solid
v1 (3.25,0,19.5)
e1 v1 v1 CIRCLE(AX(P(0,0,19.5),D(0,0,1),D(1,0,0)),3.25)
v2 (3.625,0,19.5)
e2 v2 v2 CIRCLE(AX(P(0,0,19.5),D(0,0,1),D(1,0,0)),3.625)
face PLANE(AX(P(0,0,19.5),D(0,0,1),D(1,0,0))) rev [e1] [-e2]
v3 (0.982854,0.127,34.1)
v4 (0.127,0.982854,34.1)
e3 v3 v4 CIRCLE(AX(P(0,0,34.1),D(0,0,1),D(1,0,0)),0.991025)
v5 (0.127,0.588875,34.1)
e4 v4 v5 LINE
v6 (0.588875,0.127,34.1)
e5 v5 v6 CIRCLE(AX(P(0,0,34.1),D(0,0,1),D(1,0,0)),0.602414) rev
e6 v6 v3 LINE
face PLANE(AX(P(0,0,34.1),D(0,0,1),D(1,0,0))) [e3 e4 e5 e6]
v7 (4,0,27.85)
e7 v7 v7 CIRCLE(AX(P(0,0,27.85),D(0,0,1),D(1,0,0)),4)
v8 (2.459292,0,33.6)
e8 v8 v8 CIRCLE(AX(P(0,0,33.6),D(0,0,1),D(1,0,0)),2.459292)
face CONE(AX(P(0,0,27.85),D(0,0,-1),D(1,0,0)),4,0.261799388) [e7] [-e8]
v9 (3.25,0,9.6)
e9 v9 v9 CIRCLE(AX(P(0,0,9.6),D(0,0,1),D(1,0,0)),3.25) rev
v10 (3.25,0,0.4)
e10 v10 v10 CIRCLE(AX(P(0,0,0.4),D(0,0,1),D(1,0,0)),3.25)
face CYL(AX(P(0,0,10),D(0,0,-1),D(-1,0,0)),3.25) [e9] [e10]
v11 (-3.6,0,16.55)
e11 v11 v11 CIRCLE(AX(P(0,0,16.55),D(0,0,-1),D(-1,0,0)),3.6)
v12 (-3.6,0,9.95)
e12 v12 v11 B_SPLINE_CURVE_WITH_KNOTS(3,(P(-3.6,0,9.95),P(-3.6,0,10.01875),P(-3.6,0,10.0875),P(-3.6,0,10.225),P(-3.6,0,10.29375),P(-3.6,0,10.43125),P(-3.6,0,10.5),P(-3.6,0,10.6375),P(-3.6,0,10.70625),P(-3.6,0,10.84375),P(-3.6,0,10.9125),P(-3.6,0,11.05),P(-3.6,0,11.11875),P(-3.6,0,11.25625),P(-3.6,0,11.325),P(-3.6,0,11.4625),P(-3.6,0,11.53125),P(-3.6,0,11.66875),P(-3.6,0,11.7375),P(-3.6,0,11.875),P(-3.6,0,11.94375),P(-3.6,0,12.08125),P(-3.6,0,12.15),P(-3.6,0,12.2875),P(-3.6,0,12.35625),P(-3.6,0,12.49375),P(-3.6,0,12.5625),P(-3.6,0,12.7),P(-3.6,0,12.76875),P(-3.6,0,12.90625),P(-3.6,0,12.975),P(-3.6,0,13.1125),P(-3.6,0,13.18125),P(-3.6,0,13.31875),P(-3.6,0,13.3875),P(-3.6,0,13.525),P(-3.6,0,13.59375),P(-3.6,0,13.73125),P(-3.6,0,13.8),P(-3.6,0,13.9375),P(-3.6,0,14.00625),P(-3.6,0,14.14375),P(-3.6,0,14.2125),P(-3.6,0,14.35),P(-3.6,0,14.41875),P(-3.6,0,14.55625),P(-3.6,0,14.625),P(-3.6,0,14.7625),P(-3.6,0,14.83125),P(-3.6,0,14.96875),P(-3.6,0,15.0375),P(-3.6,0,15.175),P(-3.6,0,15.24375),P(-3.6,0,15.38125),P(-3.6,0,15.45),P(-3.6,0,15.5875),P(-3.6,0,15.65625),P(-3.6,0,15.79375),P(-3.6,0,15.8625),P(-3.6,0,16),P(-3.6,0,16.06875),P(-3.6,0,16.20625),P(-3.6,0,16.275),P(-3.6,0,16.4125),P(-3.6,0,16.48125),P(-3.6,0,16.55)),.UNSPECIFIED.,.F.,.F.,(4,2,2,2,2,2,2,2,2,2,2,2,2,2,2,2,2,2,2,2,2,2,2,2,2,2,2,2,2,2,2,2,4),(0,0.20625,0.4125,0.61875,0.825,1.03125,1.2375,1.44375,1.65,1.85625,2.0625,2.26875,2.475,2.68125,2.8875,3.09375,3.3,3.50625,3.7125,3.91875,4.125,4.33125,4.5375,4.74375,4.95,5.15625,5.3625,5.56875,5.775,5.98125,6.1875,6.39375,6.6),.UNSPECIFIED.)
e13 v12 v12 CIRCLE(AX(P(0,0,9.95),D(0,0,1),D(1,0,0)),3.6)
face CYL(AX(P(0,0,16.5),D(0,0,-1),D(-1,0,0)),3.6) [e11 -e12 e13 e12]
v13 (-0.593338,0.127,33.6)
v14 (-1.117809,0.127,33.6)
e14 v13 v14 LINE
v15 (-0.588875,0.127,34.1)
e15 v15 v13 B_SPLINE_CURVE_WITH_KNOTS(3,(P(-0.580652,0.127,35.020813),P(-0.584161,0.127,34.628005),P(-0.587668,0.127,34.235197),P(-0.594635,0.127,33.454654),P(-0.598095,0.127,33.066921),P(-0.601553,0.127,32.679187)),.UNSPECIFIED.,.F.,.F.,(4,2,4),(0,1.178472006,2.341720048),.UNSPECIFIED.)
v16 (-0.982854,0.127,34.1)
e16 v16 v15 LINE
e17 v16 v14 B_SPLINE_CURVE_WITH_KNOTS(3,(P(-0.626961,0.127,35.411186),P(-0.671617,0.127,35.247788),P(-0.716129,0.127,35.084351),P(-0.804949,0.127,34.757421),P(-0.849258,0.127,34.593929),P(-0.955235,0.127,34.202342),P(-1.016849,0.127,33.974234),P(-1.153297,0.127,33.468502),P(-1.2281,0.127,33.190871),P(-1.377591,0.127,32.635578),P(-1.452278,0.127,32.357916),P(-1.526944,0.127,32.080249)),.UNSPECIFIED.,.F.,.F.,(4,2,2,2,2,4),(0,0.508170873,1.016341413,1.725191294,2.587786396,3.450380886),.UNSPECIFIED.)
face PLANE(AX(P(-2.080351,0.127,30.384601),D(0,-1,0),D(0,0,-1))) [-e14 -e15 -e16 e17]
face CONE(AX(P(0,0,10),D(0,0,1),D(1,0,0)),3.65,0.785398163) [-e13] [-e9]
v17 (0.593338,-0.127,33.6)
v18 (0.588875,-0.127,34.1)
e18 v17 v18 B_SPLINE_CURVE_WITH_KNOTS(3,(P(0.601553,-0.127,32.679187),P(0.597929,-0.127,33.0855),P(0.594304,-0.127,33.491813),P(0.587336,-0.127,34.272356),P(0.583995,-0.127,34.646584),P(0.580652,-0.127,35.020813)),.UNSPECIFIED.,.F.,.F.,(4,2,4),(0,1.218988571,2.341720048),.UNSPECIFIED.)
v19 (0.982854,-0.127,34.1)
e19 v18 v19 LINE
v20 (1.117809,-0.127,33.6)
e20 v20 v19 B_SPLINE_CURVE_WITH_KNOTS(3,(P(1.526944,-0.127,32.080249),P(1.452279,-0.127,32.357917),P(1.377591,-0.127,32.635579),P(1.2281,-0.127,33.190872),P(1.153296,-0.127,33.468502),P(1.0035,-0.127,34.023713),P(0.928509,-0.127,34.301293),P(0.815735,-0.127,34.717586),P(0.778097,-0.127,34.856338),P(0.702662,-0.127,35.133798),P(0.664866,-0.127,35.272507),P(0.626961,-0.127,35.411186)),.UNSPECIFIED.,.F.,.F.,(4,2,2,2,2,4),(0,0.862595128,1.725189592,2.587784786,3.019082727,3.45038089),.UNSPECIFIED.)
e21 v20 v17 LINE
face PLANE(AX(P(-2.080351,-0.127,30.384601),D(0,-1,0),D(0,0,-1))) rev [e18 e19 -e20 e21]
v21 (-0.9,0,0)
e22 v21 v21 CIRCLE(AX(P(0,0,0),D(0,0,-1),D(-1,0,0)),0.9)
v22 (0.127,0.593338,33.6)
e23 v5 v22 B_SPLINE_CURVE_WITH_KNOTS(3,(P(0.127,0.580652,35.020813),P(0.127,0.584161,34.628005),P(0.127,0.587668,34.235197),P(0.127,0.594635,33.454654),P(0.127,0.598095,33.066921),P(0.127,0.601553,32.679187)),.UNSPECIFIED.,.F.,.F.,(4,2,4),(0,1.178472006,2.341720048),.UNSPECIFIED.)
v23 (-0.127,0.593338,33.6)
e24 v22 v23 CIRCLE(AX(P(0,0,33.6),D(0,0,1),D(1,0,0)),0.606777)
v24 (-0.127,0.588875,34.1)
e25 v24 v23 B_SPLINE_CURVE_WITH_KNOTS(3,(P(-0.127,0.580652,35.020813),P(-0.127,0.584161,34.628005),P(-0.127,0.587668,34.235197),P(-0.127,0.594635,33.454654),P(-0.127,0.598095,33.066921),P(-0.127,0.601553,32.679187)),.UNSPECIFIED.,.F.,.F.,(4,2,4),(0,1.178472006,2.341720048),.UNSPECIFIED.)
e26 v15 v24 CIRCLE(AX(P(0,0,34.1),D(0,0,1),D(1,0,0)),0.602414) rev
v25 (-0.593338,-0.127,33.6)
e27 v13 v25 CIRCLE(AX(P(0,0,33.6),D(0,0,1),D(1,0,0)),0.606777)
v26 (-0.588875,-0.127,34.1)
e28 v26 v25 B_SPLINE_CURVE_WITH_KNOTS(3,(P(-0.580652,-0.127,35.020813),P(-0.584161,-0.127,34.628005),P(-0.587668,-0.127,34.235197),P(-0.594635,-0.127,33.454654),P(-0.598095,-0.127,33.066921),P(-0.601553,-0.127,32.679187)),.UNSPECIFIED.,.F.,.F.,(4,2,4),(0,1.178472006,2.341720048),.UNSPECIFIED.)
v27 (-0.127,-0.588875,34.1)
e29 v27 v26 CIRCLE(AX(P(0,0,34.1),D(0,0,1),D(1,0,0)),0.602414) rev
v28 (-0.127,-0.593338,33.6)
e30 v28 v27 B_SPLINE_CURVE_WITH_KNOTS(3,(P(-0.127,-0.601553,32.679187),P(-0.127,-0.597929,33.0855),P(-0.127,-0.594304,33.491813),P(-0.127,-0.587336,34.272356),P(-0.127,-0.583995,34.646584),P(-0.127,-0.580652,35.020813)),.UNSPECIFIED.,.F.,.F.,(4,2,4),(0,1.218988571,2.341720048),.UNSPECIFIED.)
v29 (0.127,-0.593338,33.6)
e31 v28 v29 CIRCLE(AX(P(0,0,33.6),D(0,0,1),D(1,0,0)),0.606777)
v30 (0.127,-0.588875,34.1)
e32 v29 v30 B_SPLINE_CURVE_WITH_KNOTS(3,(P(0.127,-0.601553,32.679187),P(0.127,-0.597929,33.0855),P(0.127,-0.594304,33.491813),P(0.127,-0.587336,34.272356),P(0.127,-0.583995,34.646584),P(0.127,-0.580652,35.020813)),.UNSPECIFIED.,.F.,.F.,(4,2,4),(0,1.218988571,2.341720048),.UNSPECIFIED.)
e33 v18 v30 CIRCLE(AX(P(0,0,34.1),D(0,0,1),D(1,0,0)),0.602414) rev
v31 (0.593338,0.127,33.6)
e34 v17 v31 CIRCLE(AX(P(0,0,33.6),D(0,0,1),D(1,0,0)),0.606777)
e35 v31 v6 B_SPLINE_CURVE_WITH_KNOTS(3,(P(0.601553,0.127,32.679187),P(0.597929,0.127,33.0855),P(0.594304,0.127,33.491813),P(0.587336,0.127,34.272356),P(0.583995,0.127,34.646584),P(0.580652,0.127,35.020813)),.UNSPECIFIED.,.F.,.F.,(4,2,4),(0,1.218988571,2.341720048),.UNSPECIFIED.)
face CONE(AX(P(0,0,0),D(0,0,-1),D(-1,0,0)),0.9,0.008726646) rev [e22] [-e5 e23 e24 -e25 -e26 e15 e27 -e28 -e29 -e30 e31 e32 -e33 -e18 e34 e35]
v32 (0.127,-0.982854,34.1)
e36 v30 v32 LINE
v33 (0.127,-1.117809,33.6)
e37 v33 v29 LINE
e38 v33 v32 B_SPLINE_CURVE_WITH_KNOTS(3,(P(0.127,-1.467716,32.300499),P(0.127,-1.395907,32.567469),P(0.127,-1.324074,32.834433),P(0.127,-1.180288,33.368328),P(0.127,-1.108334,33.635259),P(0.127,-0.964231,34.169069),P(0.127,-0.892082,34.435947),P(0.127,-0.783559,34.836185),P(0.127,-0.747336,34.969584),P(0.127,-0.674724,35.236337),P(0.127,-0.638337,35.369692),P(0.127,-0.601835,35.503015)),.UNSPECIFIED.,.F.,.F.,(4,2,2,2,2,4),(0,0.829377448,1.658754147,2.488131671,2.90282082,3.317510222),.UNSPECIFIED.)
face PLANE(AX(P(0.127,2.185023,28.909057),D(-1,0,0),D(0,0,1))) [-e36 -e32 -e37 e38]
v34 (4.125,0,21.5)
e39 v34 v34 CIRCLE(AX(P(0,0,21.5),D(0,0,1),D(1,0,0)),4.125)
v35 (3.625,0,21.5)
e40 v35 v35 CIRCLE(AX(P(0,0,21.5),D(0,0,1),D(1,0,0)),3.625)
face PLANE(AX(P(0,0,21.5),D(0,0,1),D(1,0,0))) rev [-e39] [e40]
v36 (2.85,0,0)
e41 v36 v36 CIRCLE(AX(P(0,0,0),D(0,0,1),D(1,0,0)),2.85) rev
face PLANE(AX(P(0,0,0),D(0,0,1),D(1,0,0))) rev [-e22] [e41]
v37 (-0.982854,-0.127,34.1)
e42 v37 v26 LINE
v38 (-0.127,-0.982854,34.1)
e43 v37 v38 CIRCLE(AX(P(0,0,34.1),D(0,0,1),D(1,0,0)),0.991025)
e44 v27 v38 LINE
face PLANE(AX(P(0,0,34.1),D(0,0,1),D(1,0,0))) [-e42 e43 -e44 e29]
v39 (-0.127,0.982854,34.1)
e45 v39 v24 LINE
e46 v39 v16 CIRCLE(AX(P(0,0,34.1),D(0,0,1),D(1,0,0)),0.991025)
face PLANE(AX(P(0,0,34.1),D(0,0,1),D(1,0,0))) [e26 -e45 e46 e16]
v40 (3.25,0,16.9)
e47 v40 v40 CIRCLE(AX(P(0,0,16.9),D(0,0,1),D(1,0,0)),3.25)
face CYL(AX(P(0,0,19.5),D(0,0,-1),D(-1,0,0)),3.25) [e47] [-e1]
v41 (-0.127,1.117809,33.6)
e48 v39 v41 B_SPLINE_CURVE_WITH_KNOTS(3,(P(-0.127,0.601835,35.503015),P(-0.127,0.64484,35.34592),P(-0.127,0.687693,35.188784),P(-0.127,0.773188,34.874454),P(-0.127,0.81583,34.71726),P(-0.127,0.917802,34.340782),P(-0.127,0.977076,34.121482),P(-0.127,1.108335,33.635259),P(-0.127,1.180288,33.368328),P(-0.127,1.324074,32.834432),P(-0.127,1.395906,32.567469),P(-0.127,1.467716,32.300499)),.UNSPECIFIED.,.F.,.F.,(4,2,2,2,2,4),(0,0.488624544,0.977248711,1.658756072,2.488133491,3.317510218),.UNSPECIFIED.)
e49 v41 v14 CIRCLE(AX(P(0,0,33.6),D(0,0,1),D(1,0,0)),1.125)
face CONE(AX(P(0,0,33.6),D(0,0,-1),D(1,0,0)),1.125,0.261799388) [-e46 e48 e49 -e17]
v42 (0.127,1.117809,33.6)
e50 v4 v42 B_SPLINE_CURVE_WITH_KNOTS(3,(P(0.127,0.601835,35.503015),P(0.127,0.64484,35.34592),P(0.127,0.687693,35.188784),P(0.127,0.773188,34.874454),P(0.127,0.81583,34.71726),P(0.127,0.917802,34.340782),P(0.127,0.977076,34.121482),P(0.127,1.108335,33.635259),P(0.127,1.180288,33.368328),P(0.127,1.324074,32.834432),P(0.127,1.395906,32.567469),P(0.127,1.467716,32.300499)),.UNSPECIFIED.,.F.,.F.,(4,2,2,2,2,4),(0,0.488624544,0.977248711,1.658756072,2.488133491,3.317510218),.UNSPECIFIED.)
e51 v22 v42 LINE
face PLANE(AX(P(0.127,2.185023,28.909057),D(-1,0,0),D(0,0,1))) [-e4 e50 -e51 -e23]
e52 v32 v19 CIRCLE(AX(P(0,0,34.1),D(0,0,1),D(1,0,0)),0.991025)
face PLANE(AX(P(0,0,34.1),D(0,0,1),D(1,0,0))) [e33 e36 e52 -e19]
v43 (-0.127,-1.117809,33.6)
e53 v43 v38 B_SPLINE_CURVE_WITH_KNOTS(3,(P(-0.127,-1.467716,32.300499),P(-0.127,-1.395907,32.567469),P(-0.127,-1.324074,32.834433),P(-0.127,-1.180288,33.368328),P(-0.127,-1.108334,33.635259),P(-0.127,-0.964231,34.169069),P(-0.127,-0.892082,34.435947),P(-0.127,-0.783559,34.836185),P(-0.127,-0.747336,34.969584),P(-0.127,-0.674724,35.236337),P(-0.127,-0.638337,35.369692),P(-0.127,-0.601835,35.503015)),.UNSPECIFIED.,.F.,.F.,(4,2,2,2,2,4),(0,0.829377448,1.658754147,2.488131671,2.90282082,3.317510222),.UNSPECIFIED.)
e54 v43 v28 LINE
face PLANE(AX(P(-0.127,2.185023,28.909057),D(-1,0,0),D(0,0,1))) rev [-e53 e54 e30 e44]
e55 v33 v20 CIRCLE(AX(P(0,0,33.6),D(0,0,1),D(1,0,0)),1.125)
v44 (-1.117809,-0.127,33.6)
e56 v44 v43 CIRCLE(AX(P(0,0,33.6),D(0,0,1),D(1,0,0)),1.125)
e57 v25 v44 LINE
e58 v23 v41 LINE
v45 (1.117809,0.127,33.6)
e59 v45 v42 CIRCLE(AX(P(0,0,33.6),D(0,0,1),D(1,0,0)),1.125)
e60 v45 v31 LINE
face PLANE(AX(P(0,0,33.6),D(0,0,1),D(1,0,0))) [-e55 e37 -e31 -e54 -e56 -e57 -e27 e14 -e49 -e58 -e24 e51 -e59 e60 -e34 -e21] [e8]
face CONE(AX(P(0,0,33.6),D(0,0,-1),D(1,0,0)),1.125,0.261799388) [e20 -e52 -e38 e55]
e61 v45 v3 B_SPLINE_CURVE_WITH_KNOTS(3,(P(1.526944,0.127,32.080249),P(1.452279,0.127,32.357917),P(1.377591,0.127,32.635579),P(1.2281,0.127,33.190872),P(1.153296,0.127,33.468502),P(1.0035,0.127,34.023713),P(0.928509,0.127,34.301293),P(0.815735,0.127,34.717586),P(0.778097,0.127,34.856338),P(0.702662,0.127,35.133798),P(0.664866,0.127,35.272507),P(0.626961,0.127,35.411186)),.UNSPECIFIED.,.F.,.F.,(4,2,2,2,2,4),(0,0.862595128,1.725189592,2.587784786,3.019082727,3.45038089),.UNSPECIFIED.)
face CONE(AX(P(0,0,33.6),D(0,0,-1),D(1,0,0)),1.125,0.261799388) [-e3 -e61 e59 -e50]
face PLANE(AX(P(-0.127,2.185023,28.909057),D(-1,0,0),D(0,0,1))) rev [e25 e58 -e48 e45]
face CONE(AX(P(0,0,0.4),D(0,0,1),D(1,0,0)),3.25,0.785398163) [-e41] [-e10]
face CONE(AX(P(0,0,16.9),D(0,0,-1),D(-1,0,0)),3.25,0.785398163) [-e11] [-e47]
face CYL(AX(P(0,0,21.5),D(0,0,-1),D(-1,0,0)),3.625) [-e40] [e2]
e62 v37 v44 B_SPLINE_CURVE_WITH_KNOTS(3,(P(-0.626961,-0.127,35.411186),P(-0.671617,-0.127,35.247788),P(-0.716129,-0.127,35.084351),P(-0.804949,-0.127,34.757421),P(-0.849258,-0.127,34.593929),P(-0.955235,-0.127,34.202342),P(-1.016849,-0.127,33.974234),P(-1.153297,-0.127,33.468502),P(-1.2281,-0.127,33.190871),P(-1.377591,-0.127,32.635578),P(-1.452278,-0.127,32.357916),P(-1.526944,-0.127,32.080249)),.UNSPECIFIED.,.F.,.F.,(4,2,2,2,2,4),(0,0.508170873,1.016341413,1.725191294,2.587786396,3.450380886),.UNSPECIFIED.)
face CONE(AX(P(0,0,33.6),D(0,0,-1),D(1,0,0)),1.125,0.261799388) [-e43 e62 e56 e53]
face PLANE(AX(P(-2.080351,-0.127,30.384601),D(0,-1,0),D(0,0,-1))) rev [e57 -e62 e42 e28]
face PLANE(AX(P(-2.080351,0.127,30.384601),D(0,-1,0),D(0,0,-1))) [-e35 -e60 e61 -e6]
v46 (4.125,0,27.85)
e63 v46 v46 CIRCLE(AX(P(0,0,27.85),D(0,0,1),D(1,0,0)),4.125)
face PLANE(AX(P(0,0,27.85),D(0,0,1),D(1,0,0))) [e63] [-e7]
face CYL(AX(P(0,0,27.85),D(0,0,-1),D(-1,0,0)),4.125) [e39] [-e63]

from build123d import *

# Parameters (mm, degrees)
SKETCH1_R               = 3.25
EXTRUDE1_DEPTH          = 10
SKETCH2_R               = 3.6
EXTRUDE2_DEPTH          = 6.5
SKETCH3_R               = 3.25
EXTRUDE3_DEPTH          = 3
SKETCH4_R               = 3.625
EXTRUDE4_DEPTH          = 2
SKETCH5_R               = 4.125
EXTRUDE5_DEPTH          = 6.35
SKETCH6_R               = 4
EXTRUDE6_DEPTH          = 5.75
EXTRUDE6_TAPER          = 15
SKETCH7_R               = 1.125
EXTRUDE7_DEPTH          = 0.5
EXTRUDE7_TAPER          = 15
SKETCH8_W               = 0.254
SKETCH8_H               = 4.684061481
CUT_EXTRUDE_THIN2_DEPTH = 0.5
SKETCH9_W               = 3.205351329
SKETCH9_H               = 0.254
CUT_EXTRUDE_THIN3_DEPTH = 0.5
CHAMFER1_SIZE           = 0.4
SKETCH10_R              = 0.9
CUT_EXTRUDE1_DEPTH      = 34.1
CUT_EXTRUDE1_DRAFT      = -0.5


with BuildPart() as part:
    # Sketch1 → Extrude1 (new body)
    with BuildSketch(Plane.XY):
        Circle(SKETCH1_R)
    extrude(amount=EXTRUDE1_DEPTH)

    # Sketch2 → Extrude2 (add)
    with BuildSketch(Plane.XY.offset(10)):
        with Locations(Location((0, 0, 0), (0, 0, 180))):
            Circle(SKETCH2_R)
    extrude(amount=EXTRUDE2_DEPTH)

    # Sketch3 → Extrude3 (add)
    with BuildSketch(Plane.XY.offset(16.5)):
        Circle(SKETCH3_R)
    extrude(amount=EXTRUDE3_DEPTH)

    # Sketch4 → Extrude4 (add)
    with BuildSketch(Plane.XY.offset(19.5)):
        Circle(SKETCH4_R)
    extrude(amount=EXTRUDE4_DEPTH)

    # Sketch5 → Extrude5 (add)
    with BuildSketch(Plane.XY.offset(21.5)):
        Circle(SKETCH5_R)
    extrude(amount=EXTRUDE5_DEPTH)

    # Sketch6 → Extrude6 (add)
    with BuildSketch(Plane.XY.offset(27.85)):
        Circle(SKETCH6_R)
    extrude(amount=EXTRUDE6_DEPTH, taper=EXTRUDE6_TAPER)

    # Sketch7 → Extrude7 (add)
    with BuildSketch(Plane.XY.offset(33.6)):
        Circle(SKETCH7_R)
    extrude(amount=EXTRUDE7_DEPTH, taper=EXTRUDE7_TAPER)

    # Sketch8 → Cut-Extrude-Thin2 (cut)
    with BuildSketch(Plane.XY.offset(34.1)):
        with Locations((0, -0.157007647)):
            Rectangle(SKETCH8_W, SKETCH8_H)
    extrude(amount=-CUT_EXTRUDE_THIN2_DEPTH, mode=Mode.SUBTRACT)

    # Sketch9 → Cut-Extrude-Thin3 (cut)
    with BuildSketch(Plane.XY.offset(34.1)):
        with Locations((-0.477675664, 0)):
            Rectangle(SKETCH9_W, SKETCH9_H)
    extrude(amount=-CUT_EXTRUDE_THIN3_DEPTH, mode=Mode.SUBTRACT)

    # Chamfer1
    # the kernel refuses this chamfer: 0.4 mm, written as the material it adds along each edge
    with BuildSketch(Plane(origin=(0, 0, 16.5), x_dir=(1, 0, 0), z_dir=(0, -1, 0))) as chamfer1_piece_1_section:
        Polygon((3.25, CHAMFER1_SIZE), (3.25 + CHAMFER1_SIZE, 0), (3.25, 0), align=None)
    chamfer1_piece_1 = revolve(axis=Axis((0, 0, 16.5), (0, 0, 1)), mode=Mode.PRIVATE)
    chamfer1_piece_1 = chamfer1_piece_1 & Plane(origin=(0, 0, 16.722023518), x_dir=(-1, 0, 0), z_dir=(0, 0, -1)) * Cylinder(3.6, 15, mode=Mode.PRIVATE)
    add(chamfer1_piece_1)
    with BuildSketch(Plane(origin=(0, 0, 10), x_dir=(1, 0, 0), z_dir=(0, -1, 0))) as chamfer1_piece_2_section:
        Polygon((3.25 + CHAMFER1_SIZE, 0), (3.25, -CHAMFER1_SIZE), (3.25, 0), align=None)
    chamfer1_piece_2 = revolve(axis=Axis((0, 0, 10), (0, 0, 1)), mode=Mode.PRIVATE)
    chamfer1_piece_2 = chamfer1_piece_2 & Plane(origin=(0, 0, 9.777976482), x_dir=(-1, 0, 0), z_dir=(0, 0, -1)) * Cylinder(3.6, 15, mode=Mode.PRIVATE)
    add(chamfer1_piece_2)
    # the kernel refuses this chamfer: 0.4 mm, written as the material it takes off along each edge
    with BuildSketch(Plane(origin=(0, 0, 0), x_dir=(1, 0, 0), z_dir=(0, -1, 0))) as chamfer1_2_piece_1:
        Polygon((3.25, CHAMFER1_SIZE), (3.25 - CHAMFER1_SIZE, 0), (3.25, 0), align=None)
    revolve(axis=Axis((0, 0, 0), (0, 0, 1)), mode=Mode.SUBTRACT)


with BuildPart() as cut_extrude1_tool:
    # Sketch10 → Cut-Extrude1 (with draft: the straight prism first)
    with BuildSketch(Plane(origin=(0, 0, 0), x_dir=(-1, 0, 0), z_dir=(0, 0, -1))):
        Circle(SKETCH10_R)
    extrude(amount=-CUT_EXTRUDE1_DEPTH)
    # Cut-Extrude1: the draft: its side faces are tilted about the plane it starts from
    cut_extrude1_sides = [cut_extrude1_tool.faces().sort_by_distance(p)[0] for p in [
        (0.9, 0, 17.05),
    ]]
    draft(cut_extrude1_sides, Plane(origin=(0, 0, 0), x_dir=(-1, 0, 0), z_dir=(0, 0, -1)), CUT_EXTRUDE1_DRAFT)


with BuildPart() as part_1:
    add(part.part)

    # Cut-Extrude1: cut by cut_extrude1_tool
    add(cut_extrude1_tool.part, mode=Mode.SUBTRACT)


solid = part_1.part
